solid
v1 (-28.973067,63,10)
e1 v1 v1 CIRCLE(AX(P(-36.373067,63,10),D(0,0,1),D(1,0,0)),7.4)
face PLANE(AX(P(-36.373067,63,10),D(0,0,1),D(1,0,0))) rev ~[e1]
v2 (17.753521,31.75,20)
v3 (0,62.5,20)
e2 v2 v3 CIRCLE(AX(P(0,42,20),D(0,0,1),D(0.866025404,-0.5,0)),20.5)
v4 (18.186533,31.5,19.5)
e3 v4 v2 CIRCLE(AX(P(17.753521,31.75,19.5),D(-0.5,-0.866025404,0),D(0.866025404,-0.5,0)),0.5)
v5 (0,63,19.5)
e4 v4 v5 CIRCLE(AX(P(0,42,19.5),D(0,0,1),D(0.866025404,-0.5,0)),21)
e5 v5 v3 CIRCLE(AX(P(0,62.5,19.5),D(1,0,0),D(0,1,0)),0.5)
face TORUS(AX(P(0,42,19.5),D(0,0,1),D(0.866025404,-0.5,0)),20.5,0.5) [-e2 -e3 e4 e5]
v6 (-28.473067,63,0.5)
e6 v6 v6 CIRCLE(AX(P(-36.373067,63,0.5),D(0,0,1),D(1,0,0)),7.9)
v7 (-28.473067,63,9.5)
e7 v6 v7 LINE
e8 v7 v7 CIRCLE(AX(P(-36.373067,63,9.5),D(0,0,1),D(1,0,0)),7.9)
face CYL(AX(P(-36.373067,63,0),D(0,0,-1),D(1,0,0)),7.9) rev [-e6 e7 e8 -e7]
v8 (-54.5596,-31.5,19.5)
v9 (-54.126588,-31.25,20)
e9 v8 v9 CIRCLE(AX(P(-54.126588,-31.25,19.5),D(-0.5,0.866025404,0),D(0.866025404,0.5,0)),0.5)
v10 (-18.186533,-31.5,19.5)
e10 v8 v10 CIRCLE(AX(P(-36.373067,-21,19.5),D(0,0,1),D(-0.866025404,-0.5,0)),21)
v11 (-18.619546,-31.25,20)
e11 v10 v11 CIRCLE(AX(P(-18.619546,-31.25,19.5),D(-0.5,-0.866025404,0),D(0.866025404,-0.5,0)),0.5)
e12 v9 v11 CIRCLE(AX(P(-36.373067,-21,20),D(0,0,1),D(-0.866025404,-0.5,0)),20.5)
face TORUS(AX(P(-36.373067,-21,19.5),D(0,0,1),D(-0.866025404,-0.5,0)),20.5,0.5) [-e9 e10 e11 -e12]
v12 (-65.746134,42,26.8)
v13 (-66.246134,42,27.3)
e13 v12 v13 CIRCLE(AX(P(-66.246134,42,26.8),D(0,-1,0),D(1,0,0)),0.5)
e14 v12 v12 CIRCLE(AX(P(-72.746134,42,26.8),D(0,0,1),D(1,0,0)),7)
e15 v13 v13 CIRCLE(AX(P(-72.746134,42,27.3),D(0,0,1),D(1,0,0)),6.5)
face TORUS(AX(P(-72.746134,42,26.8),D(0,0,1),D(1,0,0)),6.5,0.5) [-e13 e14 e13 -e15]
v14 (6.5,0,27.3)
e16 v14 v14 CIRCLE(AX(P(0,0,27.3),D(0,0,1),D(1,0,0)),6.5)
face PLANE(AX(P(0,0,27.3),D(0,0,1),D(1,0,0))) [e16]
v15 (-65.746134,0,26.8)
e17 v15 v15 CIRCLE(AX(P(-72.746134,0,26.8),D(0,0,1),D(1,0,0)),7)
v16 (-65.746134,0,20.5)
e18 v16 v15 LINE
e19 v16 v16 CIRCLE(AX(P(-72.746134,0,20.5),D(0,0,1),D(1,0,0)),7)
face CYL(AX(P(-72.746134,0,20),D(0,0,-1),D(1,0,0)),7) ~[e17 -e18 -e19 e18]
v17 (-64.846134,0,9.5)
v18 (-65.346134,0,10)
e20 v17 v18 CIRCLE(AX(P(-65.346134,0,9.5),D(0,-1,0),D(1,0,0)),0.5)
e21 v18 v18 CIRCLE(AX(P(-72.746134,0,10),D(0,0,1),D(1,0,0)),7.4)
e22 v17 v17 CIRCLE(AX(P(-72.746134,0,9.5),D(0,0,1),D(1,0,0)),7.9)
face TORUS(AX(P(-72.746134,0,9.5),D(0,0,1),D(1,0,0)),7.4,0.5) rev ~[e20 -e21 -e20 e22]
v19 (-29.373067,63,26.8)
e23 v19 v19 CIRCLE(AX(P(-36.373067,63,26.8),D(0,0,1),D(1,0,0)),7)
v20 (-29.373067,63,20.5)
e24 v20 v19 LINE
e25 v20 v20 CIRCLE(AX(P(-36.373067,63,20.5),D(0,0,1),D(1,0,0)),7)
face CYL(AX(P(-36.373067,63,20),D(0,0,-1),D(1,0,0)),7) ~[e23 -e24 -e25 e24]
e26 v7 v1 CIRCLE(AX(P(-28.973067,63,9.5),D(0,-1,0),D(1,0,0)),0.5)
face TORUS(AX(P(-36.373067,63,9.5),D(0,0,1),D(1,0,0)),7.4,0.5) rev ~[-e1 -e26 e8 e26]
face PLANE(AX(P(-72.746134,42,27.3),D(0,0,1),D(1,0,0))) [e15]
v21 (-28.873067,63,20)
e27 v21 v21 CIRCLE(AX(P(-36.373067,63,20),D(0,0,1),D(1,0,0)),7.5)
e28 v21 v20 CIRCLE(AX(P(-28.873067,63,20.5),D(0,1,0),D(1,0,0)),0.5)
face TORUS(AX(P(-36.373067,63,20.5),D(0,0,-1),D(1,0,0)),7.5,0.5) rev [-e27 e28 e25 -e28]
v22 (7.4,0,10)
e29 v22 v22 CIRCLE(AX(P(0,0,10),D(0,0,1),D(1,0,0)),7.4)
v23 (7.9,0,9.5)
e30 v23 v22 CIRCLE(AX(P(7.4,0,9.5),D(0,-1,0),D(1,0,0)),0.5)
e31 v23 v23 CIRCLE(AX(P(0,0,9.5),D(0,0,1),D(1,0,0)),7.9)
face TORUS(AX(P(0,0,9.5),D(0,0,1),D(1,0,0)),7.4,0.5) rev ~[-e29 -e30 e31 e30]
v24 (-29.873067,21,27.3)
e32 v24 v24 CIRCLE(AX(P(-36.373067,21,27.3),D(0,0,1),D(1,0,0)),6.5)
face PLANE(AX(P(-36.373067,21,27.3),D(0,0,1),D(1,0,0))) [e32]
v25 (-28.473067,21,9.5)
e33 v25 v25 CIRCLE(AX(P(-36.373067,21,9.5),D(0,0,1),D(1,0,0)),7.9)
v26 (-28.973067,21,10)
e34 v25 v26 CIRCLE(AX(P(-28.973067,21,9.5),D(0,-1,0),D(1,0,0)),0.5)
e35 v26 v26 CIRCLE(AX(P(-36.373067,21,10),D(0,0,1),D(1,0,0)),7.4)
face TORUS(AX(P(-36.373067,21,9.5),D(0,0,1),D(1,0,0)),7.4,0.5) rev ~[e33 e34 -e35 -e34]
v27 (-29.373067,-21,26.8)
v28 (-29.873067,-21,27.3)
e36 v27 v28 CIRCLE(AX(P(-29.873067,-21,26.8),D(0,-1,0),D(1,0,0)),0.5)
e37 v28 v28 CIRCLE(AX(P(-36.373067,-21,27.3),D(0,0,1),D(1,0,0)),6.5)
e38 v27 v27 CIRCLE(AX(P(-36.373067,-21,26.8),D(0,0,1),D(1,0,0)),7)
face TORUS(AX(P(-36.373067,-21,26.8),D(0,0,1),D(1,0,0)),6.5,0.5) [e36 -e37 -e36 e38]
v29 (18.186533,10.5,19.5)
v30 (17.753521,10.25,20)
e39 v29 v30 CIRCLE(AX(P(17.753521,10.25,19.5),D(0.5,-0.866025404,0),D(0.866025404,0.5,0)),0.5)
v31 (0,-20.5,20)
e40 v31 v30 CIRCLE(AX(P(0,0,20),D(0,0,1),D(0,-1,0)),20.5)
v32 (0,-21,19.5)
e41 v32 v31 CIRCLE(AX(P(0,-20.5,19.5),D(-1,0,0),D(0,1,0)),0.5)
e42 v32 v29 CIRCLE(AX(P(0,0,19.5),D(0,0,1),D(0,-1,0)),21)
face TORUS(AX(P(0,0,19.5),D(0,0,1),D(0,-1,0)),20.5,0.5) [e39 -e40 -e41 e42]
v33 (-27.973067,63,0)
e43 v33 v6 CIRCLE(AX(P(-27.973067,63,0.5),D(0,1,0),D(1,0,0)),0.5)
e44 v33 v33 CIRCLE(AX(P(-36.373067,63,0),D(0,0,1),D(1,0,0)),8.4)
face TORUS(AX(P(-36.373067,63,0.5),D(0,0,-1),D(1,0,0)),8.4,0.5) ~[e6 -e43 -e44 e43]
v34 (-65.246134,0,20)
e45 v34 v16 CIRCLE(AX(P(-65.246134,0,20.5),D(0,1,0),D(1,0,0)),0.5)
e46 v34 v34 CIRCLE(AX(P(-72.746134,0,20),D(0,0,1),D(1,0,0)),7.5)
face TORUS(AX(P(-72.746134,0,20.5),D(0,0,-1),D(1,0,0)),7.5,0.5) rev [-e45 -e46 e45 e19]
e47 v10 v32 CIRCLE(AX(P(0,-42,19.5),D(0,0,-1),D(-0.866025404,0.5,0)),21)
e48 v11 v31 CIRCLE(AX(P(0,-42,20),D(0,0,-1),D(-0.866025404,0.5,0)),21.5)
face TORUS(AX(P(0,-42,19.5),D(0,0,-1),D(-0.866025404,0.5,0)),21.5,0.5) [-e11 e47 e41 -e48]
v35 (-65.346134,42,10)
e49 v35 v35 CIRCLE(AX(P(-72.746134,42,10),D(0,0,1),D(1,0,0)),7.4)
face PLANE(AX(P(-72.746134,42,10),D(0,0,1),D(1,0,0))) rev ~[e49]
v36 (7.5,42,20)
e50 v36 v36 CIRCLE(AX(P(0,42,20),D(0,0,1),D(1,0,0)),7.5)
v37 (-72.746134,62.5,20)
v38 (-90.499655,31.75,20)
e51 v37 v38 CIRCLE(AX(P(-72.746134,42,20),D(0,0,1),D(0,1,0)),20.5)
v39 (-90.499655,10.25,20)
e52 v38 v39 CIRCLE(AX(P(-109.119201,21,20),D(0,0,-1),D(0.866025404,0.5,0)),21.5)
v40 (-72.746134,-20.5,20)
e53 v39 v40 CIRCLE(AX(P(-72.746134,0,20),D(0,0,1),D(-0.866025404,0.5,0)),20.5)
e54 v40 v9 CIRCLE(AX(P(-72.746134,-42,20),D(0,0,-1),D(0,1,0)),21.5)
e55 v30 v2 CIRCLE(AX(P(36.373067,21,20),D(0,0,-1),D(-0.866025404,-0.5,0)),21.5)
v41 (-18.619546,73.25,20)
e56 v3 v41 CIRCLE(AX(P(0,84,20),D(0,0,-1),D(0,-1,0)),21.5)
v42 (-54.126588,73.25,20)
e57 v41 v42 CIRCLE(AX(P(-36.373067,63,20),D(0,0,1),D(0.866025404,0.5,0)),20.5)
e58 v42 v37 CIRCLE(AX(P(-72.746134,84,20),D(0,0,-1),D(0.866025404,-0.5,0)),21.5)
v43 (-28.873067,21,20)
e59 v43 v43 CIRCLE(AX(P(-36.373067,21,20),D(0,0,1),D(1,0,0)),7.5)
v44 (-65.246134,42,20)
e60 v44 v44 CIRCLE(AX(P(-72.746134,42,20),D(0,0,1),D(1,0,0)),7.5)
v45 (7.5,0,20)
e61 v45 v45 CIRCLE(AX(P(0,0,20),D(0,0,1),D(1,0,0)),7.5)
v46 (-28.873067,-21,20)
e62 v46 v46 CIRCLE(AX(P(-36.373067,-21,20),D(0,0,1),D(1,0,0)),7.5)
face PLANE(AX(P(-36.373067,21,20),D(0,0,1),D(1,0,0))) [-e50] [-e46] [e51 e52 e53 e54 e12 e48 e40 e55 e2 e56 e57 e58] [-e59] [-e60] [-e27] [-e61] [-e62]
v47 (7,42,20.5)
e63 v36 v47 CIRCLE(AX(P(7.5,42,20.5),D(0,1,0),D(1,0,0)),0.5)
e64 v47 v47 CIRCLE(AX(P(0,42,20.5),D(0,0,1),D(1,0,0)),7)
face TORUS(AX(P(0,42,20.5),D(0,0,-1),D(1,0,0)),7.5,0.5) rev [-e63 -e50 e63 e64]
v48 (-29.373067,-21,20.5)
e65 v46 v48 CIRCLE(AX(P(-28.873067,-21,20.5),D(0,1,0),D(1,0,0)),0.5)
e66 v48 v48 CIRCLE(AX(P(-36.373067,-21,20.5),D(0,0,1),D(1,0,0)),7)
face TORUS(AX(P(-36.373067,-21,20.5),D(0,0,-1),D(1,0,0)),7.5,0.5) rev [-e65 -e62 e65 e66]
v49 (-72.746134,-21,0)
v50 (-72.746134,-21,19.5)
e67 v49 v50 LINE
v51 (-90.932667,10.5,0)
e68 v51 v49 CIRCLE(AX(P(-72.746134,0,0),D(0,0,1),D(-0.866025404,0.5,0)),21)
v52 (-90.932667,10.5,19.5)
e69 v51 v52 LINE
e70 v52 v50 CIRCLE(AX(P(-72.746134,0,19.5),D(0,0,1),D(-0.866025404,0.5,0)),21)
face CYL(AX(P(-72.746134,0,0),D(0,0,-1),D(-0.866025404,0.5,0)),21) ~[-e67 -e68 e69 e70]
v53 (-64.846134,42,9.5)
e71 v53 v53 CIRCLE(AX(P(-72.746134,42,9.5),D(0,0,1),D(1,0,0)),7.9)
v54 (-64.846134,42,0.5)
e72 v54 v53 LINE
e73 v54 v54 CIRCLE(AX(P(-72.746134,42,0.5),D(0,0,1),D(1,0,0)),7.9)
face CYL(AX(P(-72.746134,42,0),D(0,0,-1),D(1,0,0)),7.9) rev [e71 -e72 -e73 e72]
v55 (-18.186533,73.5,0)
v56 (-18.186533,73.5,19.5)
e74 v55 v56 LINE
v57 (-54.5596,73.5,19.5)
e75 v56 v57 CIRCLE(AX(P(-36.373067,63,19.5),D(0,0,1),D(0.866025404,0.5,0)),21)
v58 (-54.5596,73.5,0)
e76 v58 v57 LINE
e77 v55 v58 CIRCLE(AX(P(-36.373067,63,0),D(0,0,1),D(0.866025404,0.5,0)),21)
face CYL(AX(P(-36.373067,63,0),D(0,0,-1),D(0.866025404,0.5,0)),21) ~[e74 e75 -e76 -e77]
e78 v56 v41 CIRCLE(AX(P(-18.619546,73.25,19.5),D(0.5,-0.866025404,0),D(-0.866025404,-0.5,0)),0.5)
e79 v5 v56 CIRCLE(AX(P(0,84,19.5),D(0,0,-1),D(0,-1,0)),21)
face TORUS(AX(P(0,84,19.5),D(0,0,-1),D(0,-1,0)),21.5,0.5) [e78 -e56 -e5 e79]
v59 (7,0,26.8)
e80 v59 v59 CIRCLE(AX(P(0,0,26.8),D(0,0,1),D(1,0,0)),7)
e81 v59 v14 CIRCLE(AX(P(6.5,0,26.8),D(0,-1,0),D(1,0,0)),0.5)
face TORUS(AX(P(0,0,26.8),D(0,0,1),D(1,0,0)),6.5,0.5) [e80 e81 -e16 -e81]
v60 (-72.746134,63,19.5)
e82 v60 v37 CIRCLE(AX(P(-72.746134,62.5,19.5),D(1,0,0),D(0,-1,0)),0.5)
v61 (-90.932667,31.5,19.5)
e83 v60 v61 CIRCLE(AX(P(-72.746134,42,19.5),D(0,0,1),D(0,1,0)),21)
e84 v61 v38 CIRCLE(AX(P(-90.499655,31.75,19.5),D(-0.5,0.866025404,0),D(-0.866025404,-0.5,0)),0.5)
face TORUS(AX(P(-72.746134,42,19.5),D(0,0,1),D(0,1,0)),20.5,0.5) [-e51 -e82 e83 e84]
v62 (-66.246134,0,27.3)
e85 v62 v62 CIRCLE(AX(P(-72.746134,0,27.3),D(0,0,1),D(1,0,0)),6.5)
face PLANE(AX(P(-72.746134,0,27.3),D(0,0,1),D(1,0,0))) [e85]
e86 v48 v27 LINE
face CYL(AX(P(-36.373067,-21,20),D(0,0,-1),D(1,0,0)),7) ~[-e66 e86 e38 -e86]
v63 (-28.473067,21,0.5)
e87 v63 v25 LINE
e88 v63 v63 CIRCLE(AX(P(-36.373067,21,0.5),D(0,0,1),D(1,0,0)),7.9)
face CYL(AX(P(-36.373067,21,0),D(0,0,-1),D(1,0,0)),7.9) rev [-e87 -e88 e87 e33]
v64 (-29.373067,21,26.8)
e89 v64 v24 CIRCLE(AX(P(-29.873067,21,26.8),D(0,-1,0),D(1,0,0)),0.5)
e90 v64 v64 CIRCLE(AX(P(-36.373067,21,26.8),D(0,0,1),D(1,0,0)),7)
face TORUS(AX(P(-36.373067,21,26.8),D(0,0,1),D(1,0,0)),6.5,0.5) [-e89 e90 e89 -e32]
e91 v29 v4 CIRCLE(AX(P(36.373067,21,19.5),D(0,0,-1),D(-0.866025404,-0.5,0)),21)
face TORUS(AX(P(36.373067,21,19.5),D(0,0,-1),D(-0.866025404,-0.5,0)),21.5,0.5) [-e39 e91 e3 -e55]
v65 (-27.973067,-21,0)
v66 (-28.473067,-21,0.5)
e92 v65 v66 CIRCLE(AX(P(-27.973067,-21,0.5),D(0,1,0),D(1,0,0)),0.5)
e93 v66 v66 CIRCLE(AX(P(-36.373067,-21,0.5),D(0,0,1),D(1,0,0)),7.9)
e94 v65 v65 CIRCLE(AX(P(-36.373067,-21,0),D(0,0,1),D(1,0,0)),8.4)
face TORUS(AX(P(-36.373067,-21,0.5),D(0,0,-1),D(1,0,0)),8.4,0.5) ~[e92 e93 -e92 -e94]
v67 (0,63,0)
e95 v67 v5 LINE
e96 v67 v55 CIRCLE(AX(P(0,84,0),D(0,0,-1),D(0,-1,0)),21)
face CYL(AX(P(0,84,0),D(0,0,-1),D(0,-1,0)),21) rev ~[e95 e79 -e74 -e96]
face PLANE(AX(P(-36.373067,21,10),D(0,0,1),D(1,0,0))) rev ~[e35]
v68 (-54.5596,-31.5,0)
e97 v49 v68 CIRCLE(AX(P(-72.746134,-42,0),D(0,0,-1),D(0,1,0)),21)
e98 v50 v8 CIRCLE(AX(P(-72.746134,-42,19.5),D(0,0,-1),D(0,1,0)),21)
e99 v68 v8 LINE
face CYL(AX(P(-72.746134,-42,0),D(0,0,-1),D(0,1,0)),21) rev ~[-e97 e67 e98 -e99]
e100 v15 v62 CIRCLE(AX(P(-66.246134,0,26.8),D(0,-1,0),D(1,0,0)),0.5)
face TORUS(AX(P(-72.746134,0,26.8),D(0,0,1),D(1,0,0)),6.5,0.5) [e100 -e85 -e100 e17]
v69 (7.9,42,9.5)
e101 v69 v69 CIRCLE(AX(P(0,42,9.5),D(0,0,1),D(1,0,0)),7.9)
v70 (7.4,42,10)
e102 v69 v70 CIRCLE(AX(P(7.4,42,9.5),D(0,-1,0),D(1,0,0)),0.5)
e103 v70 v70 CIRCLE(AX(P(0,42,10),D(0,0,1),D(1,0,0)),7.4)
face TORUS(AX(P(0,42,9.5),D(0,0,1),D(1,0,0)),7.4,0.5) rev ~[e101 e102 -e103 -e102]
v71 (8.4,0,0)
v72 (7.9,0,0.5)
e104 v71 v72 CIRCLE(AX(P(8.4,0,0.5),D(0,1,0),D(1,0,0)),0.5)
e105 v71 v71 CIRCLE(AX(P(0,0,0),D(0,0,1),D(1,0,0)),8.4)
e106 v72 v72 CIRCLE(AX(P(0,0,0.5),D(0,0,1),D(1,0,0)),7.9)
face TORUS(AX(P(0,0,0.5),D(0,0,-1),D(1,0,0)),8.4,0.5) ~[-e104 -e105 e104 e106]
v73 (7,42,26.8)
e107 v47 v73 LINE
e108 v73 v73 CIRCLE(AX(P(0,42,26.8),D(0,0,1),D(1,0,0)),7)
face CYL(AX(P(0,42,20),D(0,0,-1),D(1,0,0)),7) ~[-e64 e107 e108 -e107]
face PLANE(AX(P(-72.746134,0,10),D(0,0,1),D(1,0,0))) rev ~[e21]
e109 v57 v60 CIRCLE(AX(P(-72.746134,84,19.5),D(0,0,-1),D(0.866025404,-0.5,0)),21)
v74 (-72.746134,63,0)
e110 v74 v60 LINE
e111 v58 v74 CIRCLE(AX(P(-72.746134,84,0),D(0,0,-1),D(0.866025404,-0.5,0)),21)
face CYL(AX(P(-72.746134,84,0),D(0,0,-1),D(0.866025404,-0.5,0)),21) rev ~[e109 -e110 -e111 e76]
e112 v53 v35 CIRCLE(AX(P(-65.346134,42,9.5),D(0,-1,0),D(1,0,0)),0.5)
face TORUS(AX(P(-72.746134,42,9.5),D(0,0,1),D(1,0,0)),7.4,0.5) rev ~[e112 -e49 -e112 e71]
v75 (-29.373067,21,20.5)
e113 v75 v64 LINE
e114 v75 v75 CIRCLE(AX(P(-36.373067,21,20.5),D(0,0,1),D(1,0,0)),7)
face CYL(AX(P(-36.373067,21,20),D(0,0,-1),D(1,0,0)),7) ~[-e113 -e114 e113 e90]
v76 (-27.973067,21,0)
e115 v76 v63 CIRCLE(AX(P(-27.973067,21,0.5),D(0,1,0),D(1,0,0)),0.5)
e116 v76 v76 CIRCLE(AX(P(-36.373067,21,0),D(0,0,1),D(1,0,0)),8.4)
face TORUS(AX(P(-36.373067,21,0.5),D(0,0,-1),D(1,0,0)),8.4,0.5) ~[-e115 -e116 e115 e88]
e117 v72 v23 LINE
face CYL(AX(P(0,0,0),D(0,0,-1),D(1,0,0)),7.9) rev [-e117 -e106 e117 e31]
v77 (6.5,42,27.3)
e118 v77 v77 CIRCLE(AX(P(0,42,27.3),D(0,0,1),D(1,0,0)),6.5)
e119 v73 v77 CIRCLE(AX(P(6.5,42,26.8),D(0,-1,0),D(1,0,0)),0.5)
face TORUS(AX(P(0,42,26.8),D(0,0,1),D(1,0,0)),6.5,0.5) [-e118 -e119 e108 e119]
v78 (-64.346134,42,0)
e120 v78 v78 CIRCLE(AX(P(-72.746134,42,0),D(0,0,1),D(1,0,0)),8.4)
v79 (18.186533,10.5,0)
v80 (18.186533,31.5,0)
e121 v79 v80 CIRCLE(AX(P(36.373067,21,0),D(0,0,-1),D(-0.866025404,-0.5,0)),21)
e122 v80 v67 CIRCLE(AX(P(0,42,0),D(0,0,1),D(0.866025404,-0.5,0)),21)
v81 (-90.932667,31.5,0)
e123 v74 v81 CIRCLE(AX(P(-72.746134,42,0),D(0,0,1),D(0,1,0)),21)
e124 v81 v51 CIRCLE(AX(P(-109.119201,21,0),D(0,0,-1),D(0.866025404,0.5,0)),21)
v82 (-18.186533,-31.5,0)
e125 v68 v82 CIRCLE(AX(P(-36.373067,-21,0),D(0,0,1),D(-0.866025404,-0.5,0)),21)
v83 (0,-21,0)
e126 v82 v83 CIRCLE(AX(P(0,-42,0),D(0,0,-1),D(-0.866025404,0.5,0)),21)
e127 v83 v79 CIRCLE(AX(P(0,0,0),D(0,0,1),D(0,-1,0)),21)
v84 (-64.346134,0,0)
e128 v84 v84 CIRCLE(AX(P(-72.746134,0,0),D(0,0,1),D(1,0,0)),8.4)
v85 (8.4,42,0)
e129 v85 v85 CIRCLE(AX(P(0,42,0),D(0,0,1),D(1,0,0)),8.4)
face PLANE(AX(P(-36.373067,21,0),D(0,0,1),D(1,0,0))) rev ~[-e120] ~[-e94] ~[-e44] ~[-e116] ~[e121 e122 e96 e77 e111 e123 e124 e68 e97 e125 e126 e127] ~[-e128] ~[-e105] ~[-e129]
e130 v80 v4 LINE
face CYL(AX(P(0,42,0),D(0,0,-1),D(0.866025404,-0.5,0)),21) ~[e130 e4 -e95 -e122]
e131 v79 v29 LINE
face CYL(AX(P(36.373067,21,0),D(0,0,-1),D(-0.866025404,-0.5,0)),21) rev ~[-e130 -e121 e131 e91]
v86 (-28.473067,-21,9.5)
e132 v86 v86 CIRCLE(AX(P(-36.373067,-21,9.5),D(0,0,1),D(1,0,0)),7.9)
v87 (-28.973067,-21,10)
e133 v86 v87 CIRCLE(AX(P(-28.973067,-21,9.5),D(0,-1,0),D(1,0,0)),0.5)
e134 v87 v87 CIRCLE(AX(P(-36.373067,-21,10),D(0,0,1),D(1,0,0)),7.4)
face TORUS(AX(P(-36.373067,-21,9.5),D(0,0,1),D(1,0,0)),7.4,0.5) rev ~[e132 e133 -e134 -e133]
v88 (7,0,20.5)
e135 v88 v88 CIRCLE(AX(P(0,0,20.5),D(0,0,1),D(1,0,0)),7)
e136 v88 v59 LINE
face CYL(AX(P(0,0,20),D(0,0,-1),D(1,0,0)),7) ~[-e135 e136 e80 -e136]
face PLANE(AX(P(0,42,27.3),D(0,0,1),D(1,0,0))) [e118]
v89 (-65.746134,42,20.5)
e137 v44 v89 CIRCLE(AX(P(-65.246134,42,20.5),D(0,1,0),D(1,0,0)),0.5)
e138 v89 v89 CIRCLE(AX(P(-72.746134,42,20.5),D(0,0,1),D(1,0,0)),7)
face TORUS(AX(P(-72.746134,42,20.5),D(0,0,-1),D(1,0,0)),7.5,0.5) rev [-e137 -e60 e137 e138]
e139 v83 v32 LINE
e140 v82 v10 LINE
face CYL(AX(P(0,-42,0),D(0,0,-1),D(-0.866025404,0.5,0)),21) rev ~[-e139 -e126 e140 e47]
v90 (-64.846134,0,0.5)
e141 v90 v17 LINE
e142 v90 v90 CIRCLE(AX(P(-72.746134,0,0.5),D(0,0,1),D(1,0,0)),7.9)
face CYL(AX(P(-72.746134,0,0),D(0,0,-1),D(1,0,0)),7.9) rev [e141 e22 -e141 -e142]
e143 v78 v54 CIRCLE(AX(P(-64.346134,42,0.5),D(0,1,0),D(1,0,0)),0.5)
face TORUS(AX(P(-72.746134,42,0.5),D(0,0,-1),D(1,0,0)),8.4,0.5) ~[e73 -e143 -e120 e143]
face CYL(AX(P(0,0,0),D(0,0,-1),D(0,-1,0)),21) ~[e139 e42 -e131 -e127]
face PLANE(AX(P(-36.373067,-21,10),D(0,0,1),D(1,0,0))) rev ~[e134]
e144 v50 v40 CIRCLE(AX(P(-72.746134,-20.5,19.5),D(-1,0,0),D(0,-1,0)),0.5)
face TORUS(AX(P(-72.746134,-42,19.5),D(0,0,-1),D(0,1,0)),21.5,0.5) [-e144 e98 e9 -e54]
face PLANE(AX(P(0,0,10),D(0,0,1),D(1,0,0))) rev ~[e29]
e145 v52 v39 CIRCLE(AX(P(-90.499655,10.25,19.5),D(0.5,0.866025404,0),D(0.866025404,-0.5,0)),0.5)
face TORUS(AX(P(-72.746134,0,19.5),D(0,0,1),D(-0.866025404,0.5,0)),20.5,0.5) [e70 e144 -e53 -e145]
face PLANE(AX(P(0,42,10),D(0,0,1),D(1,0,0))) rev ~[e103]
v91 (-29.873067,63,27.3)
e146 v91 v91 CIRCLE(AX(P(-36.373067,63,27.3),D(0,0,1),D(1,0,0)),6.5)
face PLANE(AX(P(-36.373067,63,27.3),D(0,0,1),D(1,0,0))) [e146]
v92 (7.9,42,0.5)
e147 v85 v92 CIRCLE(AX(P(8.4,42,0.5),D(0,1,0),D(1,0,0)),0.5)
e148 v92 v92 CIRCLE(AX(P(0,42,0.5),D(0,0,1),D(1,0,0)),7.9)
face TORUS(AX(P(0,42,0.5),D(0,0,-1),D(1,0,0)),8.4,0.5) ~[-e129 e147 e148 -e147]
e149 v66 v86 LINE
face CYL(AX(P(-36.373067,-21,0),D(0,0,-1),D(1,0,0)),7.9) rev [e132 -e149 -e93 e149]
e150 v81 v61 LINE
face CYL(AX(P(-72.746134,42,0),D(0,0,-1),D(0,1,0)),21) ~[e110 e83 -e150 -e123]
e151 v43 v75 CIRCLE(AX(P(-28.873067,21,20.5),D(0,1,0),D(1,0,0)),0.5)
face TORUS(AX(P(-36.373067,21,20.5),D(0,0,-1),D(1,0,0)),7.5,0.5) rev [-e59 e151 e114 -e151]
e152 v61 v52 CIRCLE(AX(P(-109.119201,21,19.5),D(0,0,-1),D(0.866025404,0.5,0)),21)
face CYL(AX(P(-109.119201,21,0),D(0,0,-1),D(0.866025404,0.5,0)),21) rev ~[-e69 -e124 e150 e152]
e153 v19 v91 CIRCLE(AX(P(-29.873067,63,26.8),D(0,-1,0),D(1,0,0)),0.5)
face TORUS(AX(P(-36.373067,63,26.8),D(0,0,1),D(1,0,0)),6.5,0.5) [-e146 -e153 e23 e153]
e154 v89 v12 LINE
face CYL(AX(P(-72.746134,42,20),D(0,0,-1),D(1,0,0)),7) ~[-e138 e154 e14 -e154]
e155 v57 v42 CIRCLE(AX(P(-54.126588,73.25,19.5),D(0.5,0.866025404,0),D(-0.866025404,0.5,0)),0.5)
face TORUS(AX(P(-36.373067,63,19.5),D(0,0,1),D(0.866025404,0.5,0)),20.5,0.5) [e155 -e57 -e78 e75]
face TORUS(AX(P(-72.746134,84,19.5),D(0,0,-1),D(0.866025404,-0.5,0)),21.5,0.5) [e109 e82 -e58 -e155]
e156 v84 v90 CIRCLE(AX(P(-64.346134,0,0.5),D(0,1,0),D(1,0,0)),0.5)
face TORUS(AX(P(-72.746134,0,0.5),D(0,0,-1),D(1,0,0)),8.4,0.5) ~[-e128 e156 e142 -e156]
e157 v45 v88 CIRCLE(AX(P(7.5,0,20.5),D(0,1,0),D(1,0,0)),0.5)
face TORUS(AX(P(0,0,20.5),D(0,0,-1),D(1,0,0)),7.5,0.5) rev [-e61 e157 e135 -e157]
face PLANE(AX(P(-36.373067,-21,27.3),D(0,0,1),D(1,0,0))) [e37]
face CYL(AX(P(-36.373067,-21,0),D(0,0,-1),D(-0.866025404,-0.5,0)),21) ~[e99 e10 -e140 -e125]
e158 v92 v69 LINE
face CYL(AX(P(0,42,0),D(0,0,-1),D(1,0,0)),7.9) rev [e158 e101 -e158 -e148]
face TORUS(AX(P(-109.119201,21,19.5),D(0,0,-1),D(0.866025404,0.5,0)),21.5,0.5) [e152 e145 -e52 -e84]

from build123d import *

# Parameters (mm, degrees)
F4_R     = 7.9
F5_DEPTH = 20
F6_DEPTH = 10
F7_R     = 7
F8_DEPTH = 7.3
F9_R     = 0.5


# Not quite as in the source:
# - a feature names something its author has since deleted; it is built from what else it names


with BuildPart() as f5:
    # F4 (on Top) → F5 (new body)
    with BuildSketch(Plane.XY):
        with BuildLine():
            ThreePointArc((18.1865334795, 10.5), (15.3730669589, 21), (18.1865334795, 31.5))
            ThreePointArc((18.1865334795, 31.5), (18.1865334795, 52.5), (0, 63))
            ThreePointArc((0, 63), (-10.5, 65.8134665205), (-18.1865334795, 73.5))
            ThreePointArc((-18.1865334795, 73.5), (-36.3730669589, 84), (-54.5596004384, 73.5))
            ThreePointArc((-54.5596004384, 73.5), (-62.2461339179, 65.8134665205), (-72.7461339179, 63))
            ThreePointArc((-72.7461339179, 63), (-90.9326673974, 52.5), (-90.9326673974, 31.5))
            ThreePointArc((-90.9326673974, 31.5), (-88.1192008768, 21), (-90.9326673974, 10.5))
            ThreePointArc((-90.9326673974, 10.5), (-90.9326673974, -10.5), (-72.7461339179, -21))
            ThreePointArc((-72.7461339179, -21), (-62.2461339179, -23.8134665205), (-54.5596004384, -31.5))
            ThreePointArc((-54.5596004384, -31.5), (-36.3730669589, -42), (-18.1865334795, -31.5))
            ThreePointArc((-18.1865334795, -31.5), (-10.5, -23.8134665205), (0, -21))
            ThreePointArc((0, -21), (18.1865334795, -10.5), (18.1865334795, 10.5))
        make_face()
        with Locations((-72.7461339179, 0)):
            Circle(F4_R, mode=Mode.SUBTRACT)
        with Locations((-36.3730669589, -21)):
            Circle(F4_R, mode=Mode.SUBTRACT)
        Circle(F4_R, mode=Mode.SUBTRACT)
        with Locations((-72.7461339179, 42)):
            Circle(F4_R, mode=Mode.SUBTRACT)
        with Locations((-36.3730669589, 21)):
            Circle(F4_R, mode=Mode.SUBTRACT)
        with Locations((0, 42)):
            Circle(F4_R, mode=Mode.SUBTRACT)
        with Locations((-36.3730669589, 63)):
            Circle(F4_R, mode=Mode.SUBTRACT)
        with Locations((0, 42)):
            Circle(F4_R)
        Circle(F4_R)
        with Locations((-36.3730669589, 21)):
            Circle(F4_R)
        with Locations((-36.3730669589, 63)):
            Circle(F4_R)
        with Locations((-72.7461339179, 42)):
            Circle(F4_R)
        with Locations((-72.7461339179, 0)):
            Circle(F4_R)
        with Locations((-36.3730669589, -21)):
            Circle(F4_R)
    extrude(amount=F5_DEPTH)

    # F4 (on Top) → F6 (cut)
    with BuildSketch(Plane.XY):
        with Locations((0, 42)):
            Circle(F4_R)
        Circle(F4_R)
        with Locations((-36.3730669589, 21)):
            Circle(F4_R)
        with Locations((-36.3730669589, 63)):
            Circle(F4_R)
        with Locations((-72.7461339179, 42)):
            Circle(F4_R)
        with Locations((-72.7461339179, 0)):
            Circle(F4_R)
        with Locations((-36.3730669589, -21)):
            Circle(F4_R)
    extrude(amount=F6_DEPTH, mode=Mode.SUBTRACT)

    # F7 (on face) → F8 (join)
    with BuildSketch(Plane.XY.offset(20)):
        Circle(F7_R)
        with Locations((0, 42)):
            Circle(F7_R)
        with Locations((-36.3730669589, 21)):
            Circle(F7_R)
        with Locations((-36.3730669589, 63)):
            Circle(F7_R)
        with Locations((-36.3730669589, -21)):
            Circle(F7_R)
        with Locations((-72.7461339179, 0)):
            Circle(F7_R)
        with Locations((-72.7461339179, 42)):
            Circle(F7_R)
    extrude(amount=F8_DEPTH)

    # F9
    f9_edges = [f5.edges().sort_by_distance(p)[0] for p in [
        (-7, 0, 27.3),
        (-7.9, 42, 0),
        (-7.9, 42, 10),
        (-7.9, 0, 0),
        (-7.9, 0, 10),
        (-7, 42, 27.3),
        (-7, 42, 20),
        (18.186533, 52.5, 20),
        (-43.373067, 21, 20),
        (-43.373067, 21, 27.3),
        (-28.473067, 21, 5),
        (-44.273067, 21, 0),
        (-44.273067, 21, 10),
        (-29.373067, 63, 23.65),
        (-43.373067, 63, 20),
        (-43.373067, 63, 27.3),
        (-28.473067, 63, 5),
        (-44.273067, 63, 0),
        (-44.273067, 63, 10),
        (-65.746134, 0, 23.65),
        (-79.746134, 0, 20),
        (-79.746134, 0, 27.3),
        (-29.373067, -21, 23.65),
        (-43.373067, -21, 20),
        (-43.373067, -21, 27.3),
        (-65.746134, 42, 23.65),
        (-79.746134, 42, 20),
        (-79.746134, 42, 27.3),
        (-64.846134, 42, 5),
        (-80.646134, 42, 0),
        (-80.646134, 42, 10),
        (-64.846134, 0, 5),
        (-80.646134, 0, 0),
        (-80.646134, 0, 10),
        (-28.473067, -21, 5),
        (-44.273067, -21, 0),
        (-44.273067, -21, 10),
        (-7, 0, 20),
    ]]
    fillet(f9_edges, radius=F9_R)


solid = f5.part
